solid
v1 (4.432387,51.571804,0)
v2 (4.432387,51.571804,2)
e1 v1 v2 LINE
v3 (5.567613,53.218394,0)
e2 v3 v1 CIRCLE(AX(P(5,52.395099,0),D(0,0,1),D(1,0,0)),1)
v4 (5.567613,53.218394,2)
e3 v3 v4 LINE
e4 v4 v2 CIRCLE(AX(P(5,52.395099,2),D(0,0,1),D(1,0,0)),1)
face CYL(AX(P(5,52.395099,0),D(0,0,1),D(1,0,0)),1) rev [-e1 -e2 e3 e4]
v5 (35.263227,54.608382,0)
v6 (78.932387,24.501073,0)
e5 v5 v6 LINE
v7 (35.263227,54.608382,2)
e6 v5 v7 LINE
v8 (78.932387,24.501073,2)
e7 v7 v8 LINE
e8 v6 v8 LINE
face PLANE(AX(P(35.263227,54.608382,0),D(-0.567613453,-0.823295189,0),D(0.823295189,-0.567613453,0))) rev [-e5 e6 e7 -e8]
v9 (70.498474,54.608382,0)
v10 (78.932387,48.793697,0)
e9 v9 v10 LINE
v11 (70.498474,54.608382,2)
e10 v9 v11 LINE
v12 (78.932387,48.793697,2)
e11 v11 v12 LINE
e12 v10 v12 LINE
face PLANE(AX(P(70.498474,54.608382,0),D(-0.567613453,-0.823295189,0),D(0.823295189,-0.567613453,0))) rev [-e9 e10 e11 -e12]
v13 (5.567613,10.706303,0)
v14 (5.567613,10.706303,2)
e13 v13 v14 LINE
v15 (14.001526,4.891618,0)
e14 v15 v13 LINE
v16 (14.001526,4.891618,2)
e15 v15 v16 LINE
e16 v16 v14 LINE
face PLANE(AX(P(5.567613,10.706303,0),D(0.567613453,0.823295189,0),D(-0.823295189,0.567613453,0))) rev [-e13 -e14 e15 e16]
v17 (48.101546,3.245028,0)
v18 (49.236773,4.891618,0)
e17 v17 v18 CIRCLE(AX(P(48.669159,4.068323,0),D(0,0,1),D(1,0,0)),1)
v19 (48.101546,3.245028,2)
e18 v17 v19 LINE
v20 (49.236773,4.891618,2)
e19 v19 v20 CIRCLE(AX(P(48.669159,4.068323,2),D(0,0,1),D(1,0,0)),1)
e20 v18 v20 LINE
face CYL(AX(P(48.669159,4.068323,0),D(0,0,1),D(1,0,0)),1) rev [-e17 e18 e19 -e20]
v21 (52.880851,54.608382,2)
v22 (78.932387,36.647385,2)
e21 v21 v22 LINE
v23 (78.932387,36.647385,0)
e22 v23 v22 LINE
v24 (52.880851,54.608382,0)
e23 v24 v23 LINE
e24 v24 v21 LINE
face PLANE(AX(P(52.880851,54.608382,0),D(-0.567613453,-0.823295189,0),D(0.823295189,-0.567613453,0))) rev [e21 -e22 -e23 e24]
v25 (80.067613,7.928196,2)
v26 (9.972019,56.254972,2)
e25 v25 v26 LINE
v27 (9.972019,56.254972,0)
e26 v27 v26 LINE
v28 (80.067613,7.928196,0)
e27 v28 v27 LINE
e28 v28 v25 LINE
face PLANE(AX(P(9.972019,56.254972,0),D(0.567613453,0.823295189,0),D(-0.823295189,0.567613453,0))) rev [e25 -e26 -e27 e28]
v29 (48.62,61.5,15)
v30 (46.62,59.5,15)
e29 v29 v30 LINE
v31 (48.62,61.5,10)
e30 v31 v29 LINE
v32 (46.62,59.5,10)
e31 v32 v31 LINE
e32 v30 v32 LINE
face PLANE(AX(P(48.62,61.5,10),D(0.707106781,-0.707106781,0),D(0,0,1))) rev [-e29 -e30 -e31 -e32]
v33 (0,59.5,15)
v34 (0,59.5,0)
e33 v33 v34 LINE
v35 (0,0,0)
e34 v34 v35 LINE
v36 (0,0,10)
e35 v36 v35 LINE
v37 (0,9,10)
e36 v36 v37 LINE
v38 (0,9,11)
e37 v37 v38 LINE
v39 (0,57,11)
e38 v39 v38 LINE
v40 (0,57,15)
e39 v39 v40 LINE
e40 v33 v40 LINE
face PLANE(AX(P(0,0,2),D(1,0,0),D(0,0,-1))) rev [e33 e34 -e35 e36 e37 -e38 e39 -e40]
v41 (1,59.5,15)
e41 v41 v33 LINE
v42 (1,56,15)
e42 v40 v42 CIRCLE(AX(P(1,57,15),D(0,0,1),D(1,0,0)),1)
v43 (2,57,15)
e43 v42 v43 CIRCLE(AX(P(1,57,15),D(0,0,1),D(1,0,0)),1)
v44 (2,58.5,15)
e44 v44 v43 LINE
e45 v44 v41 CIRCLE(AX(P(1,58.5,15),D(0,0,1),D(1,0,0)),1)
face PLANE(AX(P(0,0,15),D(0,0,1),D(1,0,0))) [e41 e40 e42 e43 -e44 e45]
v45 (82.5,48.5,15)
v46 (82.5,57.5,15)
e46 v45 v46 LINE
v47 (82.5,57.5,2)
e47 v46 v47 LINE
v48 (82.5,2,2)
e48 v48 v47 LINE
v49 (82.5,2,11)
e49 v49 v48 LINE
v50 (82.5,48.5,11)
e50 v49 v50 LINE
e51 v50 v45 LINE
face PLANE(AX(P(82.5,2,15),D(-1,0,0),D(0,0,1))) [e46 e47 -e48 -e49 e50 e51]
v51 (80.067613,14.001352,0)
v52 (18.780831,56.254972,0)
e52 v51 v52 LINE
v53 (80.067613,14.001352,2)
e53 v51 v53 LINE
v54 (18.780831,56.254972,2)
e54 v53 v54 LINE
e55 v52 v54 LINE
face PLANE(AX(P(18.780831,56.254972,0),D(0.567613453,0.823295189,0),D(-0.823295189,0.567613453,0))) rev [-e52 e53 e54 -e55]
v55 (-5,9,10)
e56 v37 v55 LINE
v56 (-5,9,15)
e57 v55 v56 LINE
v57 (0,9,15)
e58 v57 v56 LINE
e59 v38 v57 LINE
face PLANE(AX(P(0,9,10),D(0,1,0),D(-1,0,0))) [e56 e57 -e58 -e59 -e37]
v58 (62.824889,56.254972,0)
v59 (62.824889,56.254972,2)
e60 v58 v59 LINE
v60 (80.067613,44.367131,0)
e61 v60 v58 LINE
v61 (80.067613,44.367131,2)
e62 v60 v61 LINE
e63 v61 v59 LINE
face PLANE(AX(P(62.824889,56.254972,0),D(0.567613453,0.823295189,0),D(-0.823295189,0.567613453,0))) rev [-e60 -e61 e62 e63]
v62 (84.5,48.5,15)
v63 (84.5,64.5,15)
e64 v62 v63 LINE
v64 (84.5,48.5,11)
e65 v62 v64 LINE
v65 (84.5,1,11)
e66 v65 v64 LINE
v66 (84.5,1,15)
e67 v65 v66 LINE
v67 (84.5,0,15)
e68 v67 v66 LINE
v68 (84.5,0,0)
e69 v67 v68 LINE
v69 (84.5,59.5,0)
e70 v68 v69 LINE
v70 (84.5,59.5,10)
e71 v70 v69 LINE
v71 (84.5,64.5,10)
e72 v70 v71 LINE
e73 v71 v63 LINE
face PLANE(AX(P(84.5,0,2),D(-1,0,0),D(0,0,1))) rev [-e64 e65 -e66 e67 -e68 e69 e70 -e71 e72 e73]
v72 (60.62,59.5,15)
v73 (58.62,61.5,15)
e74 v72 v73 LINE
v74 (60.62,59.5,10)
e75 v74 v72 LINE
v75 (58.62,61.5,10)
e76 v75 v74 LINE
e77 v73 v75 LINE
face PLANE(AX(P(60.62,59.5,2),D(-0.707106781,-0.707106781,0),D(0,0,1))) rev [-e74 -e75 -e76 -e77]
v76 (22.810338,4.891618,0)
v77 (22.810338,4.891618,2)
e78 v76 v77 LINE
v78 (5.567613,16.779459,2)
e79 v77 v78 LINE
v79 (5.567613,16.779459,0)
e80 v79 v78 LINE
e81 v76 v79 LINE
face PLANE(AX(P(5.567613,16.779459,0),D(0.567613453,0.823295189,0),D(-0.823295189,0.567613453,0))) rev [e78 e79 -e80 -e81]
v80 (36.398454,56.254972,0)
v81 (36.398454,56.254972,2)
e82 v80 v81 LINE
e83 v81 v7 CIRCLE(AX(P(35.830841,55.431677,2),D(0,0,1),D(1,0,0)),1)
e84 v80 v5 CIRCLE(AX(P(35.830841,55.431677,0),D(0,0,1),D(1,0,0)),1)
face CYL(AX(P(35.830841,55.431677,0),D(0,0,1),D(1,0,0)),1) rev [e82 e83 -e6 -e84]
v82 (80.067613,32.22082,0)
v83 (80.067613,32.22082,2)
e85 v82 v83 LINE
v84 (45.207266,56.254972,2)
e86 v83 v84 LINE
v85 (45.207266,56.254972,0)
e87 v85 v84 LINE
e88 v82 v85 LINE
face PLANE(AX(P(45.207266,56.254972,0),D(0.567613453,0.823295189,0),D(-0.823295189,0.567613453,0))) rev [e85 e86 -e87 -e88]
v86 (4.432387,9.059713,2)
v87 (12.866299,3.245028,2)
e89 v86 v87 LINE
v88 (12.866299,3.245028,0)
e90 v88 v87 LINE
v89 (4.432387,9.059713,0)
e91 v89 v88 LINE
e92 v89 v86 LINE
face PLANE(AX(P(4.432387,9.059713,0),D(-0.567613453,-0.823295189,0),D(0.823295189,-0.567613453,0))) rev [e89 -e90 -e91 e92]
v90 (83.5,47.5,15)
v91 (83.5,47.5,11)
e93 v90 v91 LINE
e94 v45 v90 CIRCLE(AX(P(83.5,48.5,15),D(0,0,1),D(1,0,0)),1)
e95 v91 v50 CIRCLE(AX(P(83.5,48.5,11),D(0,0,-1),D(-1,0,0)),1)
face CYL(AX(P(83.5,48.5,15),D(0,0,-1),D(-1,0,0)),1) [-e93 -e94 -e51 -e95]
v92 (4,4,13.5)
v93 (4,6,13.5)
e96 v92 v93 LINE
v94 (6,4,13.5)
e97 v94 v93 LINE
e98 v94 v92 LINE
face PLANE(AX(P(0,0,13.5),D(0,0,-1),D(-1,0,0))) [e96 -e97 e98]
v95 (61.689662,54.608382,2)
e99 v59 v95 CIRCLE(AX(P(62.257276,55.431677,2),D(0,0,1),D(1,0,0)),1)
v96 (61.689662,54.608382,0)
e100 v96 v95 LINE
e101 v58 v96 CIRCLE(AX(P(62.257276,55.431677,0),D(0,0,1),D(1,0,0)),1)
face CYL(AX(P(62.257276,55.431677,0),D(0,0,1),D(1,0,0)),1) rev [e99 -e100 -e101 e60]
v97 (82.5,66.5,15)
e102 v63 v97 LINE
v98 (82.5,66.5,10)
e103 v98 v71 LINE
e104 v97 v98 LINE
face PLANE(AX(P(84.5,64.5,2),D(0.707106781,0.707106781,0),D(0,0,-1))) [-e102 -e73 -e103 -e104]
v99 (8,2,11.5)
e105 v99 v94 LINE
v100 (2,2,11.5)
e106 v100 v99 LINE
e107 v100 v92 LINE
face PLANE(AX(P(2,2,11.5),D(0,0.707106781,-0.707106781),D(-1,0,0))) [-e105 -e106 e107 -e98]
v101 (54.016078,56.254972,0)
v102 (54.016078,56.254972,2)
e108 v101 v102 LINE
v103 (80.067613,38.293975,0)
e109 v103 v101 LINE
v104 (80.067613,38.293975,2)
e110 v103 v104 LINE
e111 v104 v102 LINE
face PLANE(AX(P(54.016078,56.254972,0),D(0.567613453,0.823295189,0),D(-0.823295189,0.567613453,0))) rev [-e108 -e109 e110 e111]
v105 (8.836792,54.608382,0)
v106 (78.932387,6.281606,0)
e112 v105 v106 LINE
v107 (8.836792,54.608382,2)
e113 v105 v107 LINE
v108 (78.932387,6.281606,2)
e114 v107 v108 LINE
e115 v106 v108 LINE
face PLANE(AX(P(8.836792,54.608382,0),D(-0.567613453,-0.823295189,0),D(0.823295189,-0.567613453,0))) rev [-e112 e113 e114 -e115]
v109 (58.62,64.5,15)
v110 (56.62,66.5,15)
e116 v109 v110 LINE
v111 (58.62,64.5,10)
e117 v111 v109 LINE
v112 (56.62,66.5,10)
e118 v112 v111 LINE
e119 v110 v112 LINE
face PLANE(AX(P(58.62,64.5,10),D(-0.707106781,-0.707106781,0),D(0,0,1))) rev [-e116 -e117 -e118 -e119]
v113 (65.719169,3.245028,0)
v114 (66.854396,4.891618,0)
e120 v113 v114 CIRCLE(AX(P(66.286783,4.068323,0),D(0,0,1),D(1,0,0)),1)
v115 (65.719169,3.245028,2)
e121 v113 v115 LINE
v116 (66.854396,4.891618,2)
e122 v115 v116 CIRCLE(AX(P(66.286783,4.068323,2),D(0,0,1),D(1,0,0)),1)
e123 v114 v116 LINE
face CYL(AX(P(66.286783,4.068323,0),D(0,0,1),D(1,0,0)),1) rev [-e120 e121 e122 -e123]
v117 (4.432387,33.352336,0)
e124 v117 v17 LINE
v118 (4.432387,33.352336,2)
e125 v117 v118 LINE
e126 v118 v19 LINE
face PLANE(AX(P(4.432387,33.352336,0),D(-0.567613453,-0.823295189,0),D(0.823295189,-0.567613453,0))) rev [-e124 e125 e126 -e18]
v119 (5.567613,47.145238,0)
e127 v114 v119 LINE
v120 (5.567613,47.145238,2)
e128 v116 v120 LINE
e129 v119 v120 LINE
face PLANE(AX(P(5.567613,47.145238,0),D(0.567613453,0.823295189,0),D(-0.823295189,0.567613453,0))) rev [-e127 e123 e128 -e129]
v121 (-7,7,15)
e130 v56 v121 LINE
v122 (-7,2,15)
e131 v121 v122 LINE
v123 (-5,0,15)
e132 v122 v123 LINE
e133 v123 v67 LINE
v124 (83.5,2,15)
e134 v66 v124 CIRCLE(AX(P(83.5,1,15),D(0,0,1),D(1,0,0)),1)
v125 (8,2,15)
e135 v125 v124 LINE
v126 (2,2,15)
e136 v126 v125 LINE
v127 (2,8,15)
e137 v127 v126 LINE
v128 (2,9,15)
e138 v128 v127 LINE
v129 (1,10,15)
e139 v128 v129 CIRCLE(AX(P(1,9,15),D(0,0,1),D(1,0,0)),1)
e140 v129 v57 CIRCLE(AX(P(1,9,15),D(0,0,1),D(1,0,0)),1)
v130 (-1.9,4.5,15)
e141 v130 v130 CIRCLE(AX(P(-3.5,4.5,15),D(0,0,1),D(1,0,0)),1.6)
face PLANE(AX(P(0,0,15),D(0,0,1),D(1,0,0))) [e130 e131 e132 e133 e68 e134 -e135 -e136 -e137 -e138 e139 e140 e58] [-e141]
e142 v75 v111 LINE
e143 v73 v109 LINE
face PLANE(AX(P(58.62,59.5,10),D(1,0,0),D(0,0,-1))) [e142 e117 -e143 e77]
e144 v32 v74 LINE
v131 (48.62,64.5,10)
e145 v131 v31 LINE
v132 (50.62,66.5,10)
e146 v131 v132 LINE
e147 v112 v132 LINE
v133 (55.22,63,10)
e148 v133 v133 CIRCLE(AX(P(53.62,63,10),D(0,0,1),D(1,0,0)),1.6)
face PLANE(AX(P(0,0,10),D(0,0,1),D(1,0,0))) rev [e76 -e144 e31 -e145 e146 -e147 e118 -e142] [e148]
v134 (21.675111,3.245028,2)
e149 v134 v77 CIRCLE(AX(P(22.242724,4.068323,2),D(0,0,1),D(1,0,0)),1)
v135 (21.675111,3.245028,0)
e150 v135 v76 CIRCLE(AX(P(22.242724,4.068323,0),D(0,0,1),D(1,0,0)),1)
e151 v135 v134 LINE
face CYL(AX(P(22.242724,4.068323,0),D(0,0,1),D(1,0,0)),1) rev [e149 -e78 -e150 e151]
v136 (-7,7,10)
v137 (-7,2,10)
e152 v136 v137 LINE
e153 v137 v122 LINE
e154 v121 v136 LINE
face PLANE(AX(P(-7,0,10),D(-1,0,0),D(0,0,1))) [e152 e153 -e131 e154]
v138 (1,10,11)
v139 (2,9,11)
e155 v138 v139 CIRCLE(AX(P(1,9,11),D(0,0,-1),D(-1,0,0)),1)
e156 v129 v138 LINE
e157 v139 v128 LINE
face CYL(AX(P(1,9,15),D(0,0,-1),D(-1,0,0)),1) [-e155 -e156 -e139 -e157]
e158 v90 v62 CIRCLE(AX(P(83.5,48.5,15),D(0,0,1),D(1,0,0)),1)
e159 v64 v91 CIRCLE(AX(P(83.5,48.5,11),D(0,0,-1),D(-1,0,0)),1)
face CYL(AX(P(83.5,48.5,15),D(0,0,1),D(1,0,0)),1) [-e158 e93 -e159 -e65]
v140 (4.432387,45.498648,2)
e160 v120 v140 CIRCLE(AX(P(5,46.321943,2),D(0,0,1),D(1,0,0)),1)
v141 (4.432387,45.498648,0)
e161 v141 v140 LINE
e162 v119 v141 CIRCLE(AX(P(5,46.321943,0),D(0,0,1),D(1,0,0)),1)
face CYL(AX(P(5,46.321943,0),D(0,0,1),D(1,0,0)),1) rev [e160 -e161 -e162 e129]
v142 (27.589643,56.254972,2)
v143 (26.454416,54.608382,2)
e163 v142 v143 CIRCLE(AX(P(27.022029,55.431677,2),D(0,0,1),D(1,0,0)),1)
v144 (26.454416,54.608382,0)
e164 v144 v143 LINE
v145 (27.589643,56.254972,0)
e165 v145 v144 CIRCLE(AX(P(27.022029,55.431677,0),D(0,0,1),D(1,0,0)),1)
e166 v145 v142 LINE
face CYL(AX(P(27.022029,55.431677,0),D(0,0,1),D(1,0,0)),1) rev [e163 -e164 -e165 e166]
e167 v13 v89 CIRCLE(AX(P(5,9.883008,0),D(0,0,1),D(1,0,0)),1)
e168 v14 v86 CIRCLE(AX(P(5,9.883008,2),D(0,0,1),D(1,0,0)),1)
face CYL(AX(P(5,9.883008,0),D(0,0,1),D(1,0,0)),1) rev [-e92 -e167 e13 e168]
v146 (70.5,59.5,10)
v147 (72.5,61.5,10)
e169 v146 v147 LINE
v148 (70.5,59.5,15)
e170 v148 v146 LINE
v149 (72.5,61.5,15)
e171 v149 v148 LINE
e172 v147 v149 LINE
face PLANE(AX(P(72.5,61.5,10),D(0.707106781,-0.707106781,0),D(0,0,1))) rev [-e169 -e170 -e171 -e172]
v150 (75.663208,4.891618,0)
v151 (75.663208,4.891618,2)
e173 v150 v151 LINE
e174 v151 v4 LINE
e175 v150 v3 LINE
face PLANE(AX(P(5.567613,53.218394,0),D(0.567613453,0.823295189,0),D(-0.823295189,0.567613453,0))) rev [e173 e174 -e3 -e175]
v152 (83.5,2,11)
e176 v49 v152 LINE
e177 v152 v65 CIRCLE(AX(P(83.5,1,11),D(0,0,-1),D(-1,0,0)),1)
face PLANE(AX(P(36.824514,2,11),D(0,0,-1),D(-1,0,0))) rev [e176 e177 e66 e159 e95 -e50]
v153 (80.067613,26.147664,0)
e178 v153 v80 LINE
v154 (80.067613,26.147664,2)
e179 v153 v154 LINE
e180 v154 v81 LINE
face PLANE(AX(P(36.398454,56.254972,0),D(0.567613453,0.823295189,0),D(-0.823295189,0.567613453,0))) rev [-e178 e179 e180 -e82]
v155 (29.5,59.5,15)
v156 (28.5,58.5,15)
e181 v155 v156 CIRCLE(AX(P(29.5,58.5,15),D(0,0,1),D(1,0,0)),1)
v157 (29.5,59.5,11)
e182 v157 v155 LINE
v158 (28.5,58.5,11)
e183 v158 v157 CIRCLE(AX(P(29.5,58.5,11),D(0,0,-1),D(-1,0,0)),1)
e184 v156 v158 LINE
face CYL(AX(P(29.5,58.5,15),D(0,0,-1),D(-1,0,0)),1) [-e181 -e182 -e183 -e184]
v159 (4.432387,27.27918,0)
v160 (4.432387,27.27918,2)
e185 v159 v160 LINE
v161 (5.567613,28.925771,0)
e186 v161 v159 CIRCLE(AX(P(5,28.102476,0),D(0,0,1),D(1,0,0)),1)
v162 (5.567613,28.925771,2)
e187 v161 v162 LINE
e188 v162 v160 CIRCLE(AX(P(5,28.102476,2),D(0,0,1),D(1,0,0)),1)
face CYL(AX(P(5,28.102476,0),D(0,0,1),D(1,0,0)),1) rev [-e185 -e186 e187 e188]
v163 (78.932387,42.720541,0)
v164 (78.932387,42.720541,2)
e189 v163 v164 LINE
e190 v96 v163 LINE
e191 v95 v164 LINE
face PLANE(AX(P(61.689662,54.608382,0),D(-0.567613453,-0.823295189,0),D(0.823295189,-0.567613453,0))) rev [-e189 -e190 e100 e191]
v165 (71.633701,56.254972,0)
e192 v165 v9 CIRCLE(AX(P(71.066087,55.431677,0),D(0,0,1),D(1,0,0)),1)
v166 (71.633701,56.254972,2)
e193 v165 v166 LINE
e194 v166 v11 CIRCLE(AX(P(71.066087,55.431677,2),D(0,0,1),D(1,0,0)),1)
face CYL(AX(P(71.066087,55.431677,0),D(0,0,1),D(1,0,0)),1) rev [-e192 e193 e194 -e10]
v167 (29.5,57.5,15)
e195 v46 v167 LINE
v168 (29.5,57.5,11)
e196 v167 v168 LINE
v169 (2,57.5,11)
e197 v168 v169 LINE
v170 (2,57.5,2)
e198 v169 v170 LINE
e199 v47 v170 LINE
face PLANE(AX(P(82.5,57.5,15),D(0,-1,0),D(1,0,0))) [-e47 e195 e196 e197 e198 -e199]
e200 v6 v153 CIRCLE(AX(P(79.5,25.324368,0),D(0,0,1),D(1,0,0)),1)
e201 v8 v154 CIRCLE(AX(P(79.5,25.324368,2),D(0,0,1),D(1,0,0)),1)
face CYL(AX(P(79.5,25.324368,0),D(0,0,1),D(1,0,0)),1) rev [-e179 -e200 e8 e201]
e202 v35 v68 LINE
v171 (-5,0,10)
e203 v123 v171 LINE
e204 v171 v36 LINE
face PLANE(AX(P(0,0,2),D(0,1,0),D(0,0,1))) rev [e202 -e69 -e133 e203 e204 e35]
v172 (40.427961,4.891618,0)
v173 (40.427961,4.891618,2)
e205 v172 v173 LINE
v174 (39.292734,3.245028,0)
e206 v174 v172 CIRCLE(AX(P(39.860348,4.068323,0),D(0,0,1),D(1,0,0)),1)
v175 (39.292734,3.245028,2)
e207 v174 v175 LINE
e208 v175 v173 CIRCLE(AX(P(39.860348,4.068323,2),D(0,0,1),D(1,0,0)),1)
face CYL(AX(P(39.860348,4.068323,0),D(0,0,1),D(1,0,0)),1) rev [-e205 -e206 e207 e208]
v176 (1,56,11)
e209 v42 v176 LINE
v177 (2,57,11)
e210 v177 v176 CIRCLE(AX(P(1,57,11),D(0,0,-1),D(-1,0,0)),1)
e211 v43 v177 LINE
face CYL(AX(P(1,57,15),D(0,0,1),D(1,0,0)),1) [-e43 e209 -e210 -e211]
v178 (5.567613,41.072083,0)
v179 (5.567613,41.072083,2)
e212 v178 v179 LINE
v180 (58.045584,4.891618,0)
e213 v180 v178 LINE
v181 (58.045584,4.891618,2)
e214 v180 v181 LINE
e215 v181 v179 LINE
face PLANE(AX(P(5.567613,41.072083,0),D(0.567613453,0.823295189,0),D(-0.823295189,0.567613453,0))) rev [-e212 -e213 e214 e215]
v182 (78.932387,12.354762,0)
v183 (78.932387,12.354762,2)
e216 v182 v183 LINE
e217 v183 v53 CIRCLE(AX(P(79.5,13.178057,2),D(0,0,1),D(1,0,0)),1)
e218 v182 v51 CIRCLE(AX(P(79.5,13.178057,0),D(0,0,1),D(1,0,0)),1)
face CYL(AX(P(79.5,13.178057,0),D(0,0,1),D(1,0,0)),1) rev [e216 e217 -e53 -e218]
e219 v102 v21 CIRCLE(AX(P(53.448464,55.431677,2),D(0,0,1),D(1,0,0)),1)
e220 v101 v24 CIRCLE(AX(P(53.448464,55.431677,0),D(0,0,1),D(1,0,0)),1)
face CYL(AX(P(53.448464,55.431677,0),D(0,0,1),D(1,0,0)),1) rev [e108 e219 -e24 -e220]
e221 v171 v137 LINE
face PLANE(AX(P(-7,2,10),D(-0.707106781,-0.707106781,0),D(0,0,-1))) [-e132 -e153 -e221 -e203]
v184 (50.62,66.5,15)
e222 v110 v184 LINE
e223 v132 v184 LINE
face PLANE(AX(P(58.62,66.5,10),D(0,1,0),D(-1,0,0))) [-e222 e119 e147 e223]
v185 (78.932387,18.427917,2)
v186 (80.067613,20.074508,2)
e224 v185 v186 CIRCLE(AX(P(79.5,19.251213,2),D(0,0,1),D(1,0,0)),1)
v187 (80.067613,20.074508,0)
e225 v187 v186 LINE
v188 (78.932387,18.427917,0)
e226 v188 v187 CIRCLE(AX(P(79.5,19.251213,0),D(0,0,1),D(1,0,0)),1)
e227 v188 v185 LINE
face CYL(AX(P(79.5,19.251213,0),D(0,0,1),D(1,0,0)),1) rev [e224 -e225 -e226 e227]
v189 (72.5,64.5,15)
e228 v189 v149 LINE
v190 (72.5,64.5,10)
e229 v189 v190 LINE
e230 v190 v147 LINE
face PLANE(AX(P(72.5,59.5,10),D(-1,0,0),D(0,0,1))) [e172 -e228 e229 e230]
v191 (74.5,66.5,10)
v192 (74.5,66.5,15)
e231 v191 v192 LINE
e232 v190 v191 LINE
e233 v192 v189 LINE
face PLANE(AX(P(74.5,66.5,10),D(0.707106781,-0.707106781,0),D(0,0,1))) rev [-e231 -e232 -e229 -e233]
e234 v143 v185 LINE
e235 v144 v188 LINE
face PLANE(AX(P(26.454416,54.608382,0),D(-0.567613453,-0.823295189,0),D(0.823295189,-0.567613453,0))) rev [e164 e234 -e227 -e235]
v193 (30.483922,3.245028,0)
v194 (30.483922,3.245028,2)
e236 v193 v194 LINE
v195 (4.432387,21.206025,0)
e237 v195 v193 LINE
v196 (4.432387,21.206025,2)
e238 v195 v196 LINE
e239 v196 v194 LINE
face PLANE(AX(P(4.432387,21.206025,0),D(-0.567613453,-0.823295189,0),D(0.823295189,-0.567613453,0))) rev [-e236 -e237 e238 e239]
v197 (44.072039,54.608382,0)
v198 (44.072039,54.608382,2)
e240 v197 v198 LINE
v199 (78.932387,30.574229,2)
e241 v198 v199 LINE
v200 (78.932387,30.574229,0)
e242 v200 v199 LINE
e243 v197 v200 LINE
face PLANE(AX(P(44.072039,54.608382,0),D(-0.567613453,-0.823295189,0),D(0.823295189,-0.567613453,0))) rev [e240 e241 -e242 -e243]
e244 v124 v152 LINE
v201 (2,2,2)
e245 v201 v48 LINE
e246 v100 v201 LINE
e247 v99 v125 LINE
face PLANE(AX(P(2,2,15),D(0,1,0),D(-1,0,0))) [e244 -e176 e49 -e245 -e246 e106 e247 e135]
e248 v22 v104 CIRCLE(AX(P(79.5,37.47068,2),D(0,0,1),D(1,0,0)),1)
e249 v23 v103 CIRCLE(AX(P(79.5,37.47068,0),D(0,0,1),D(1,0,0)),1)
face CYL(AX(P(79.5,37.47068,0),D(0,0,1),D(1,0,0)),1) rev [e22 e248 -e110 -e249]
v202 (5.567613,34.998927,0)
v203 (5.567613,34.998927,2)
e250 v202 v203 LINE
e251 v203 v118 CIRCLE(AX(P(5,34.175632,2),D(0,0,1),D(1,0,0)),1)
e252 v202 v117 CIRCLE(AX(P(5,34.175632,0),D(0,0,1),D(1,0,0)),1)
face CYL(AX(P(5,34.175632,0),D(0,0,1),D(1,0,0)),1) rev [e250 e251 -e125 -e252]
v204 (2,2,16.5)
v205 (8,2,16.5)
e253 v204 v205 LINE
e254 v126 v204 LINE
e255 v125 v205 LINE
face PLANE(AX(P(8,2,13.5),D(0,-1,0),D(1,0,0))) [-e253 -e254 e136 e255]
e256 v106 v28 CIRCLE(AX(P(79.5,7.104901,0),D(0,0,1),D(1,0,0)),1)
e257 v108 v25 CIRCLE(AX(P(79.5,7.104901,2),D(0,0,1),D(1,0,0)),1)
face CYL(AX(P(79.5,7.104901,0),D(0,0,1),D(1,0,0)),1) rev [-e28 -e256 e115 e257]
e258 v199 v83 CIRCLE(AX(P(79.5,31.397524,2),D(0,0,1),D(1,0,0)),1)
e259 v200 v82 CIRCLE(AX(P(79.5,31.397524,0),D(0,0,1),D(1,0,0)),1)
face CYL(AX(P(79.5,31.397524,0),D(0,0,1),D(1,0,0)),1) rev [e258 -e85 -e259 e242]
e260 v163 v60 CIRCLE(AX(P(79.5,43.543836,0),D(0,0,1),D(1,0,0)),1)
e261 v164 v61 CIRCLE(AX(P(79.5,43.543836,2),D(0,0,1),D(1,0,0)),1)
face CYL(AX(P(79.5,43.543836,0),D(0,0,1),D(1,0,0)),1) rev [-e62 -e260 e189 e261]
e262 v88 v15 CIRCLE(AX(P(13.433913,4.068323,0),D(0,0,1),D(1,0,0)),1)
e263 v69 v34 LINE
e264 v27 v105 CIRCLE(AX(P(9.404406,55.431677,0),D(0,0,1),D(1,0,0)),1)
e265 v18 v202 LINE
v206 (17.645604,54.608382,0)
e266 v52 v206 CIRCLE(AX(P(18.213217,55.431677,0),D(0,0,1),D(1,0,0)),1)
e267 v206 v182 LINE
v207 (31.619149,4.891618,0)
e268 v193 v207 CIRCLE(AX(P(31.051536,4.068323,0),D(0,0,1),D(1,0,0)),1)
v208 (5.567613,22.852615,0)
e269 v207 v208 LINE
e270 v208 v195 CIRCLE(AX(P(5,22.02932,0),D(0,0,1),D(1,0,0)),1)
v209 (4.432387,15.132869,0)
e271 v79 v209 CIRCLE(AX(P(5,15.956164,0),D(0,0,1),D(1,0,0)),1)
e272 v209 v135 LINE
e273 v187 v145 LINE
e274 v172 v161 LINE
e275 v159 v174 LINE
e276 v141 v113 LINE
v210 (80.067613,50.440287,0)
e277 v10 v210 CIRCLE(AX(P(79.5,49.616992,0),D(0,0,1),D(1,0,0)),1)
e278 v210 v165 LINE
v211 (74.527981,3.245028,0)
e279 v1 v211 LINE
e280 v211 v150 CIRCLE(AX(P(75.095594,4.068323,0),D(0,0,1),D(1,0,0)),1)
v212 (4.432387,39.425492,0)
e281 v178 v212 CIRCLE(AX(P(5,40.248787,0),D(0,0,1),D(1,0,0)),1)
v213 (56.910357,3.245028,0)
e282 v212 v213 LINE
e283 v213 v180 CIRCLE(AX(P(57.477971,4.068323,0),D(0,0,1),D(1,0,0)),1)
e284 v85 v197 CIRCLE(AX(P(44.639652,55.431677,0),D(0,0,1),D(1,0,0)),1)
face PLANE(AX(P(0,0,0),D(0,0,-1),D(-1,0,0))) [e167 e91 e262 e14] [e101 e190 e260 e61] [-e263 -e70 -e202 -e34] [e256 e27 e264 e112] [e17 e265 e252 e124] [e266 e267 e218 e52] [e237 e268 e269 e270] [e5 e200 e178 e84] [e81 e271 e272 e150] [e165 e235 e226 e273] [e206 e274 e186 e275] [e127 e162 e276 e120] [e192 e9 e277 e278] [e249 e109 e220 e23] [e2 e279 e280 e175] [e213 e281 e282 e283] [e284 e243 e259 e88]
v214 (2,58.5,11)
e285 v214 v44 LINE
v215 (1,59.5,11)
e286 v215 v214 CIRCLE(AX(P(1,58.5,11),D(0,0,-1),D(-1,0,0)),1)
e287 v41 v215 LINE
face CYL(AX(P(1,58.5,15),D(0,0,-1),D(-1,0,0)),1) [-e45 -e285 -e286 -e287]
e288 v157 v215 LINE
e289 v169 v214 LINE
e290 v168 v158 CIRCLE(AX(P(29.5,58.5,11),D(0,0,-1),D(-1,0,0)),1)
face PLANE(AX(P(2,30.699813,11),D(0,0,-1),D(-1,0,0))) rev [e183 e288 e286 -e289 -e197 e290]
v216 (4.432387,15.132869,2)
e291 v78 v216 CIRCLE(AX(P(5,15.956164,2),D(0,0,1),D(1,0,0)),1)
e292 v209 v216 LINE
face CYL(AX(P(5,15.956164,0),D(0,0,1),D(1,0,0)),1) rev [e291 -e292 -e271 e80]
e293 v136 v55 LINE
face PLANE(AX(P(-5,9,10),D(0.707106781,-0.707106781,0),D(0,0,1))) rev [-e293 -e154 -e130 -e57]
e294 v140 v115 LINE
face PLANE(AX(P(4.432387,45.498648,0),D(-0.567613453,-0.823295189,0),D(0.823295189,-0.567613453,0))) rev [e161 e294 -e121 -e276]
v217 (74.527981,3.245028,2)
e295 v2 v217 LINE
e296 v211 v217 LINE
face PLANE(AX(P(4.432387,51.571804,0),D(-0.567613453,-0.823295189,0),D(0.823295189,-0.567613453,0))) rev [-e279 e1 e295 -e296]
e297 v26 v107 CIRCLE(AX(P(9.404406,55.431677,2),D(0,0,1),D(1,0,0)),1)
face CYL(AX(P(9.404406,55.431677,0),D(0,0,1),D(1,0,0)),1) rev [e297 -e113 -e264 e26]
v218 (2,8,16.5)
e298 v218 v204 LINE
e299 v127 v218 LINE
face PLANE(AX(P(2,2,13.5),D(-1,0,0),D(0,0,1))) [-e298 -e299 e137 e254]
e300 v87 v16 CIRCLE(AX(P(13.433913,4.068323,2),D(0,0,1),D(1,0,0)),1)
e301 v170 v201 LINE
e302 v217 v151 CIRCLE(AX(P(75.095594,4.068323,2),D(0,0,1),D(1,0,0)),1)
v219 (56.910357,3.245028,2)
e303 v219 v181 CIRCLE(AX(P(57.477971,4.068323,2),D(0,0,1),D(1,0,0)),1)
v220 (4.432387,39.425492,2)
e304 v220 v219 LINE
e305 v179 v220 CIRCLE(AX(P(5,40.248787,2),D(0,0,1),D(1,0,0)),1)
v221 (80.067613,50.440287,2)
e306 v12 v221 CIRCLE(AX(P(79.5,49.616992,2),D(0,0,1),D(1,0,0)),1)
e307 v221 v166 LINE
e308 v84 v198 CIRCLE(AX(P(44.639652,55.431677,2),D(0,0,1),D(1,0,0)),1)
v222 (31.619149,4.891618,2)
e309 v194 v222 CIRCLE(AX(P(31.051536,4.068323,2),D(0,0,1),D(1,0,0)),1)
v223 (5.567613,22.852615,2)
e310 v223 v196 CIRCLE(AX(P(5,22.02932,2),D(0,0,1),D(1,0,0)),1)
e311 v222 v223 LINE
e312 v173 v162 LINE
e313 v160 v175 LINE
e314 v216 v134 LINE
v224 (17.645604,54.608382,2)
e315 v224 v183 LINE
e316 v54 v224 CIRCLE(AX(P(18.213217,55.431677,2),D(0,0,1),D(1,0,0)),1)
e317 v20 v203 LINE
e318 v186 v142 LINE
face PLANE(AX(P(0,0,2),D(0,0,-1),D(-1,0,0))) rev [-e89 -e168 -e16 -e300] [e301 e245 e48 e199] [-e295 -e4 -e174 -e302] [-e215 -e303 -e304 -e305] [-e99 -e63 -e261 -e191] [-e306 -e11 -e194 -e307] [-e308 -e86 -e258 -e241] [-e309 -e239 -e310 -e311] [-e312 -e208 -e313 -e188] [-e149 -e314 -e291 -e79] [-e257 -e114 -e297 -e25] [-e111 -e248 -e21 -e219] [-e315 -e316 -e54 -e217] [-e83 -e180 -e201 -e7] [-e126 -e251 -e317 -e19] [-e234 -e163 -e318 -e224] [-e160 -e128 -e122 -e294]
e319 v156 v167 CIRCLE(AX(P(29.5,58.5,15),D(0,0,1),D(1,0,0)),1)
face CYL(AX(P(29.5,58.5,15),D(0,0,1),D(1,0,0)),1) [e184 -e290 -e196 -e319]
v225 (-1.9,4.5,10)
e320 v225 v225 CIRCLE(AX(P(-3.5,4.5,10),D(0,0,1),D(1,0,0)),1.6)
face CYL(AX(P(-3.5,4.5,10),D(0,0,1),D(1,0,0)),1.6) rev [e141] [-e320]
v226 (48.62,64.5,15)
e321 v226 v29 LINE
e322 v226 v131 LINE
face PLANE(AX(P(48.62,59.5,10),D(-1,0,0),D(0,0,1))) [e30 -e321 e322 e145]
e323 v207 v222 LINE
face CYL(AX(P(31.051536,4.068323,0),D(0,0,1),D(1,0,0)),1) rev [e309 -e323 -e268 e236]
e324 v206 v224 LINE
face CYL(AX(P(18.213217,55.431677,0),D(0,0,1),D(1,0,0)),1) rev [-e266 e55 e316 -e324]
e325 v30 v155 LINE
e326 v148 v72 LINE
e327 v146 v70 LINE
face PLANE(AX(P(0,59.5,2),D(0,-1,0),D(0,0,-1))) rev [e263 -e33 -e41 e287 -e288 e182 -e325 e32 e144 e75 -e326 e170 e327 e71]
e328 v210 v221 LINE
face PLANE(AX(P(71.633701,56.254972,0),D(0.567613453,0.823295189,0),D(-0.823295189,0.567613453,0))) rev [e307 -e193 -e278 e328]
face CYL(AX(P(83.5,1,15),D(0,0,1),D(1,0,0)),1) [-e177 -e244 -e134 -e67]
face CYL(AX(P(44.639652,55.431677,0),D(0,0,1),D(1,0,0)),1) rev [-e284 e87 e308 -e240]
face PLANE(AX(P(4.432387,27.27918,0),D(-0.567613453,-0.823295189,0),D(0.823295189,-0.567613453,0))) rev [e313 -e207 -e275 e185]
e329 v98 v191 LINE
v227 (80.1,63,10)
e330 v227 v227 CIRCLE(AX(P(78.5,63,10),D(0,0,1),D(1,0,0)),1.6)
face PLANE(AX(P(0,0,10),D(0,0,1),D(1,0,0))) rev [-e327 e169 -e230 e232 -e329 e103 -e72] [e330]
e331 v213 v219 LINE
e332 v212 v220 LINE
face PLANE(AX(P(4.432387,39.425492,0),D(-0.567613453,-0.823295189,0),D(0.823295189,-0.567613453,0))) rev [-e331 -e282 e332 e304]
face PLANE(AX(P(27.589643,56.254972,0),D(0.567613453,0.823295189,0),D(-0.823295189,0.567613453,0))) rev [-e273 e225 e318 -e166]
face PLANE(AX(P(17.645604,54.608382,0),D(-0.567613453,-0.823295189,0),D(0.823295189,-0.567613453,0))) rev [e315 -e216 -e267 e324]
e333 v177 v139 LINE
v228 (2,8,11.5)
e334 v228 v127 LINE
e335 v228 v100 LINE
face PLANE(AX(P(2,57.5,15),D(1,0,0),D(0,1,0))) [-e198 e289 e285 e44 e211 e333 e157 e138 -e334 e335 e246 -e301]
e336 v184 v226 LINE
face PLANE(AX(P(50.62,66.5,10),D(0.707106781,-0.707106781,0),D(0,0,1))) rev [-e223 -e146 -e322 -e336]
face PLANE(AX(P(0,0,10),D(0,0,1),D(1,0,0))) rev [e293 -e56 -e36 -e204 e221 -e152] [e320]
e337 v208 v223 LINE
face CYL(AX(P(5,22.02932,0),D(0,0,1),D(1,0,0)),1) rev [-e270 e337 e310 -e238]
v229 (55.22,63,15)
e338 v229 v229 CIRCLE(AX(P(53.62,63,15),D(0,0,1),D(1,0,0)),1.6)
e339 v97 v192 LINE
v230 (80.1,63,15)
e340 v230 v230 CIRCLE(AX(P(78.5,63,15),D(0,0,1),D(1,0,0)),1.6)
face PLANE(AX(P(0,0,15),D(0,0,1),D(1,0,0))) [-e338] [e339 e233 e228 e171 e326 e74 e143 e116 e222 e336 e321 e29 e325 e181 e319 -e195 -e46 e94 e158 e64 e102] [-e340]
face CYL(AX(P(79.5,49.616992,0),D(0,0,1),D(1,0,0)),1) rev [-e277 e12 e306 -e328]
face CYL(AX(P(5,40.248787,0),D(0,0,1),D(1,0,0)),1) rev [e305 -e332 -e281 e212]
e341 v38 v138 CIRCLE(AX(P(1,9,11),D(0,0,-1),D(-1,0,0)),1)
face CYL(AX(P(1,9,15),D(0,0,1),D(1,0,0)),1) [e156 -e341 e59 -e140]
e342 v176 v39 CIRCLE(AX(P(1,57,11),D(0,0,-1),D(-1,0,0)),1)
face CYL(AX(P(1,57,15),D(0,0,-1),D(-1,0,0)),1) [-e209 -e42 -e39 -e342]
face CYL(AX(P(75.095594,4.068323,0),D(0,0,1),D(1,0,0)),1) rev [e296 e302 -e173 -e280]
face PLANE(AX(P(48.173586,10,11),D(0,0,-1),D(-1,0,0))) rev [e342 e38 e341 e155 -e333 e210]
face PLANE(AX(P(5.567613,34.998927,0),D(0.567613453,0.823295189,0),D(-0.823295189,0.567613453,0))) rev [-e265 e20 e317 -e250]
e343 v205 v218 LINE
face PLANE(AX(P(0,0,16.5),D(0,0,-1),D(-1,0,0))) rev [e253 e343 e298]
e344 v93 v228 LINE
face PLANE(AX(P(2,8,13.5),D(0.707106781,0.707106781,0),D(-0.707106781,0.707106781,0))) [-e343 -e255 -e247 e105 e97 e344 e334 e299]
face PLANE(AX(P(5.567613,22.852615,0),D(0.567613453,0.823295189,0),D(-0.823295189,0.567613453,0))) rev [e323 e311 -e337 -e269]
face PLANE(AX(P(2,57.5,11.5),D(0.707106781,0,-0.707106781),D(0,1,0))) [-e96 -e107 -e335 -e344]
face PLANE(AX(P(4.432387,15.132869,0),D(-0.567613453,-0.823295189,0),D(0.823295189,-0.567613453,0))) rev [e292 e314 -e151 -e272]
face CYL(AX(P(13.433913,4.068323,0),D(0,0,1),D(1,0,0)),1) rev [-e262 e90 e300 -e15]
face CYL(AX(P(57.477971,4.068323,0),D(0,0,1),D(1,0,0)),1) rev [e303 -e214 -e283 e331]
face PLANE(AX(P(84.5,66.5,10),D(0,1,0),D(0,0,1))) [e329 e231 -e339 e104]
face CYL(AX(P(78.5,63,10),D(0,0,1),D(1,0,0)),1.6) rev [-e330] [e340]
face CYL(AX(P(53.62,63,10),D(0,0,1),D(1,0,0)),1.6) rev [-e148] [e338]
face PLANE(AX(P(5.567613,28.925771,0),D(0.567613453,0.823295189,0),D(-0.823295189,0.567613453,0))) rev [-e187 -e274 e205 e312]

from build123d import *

# Parameters (mm, degrees)
SKETCH_1_W          = 84.5
SKETCH_1_H          = 59.5
EXTRUDE_1_DEPTH     = 2
SKETCH_2_W          = 84.5
SKETCH_2_H          = 59.5
SKETCH_2_W_2        = 80.5
SKETCH_2_H_2        = 55.5
EXTRUDE_2_DEPTH     = 13
SKETCH_3_W          = 26.5
SKETCH_3_H          = 4
CUT_EXTRUDE_1_DEPTH = 2
SKETCH_4_W          = 4
SKETCH_4_H          = 46
CUT_EXTRUDE_2_DEPTH = 2
SKETCH_5_W          = 4
SKETCH_5_H          = 45.5
CUT_EXTRUDE_3_DEPTH = 2
CUT_EXTRUDE_4_DEPTH = 105.160933176
SKETCH_9_W          = 7
SKETCH_9_H          = 9
SKETCH_9_R          = 1.6
EXTRUDE_5_DEPTH     = 5
FILLET_1_R          = 1
EXTRUDE_8_DEPTH     = 3
CHAMFER_4_SIZE      = 2
SKETCH_16_W         = 12
SKETCH_16_H         = 7
SKETCH_16_R         = 1.6
SKETCH_16_W_2       = 10
EXTRUDE_9_DEPTH     = 5
CHAMFER_5_SIZE      = 2


with BuildPart() as part:
    # 草图1 → 凸台-拉伸1 (new body)
    with BuildSketch(Plane.XY):
        with Locations((42.25, 29.75)):
            Rectangle(SKETCH_1_W, SKETCH_1_H)
    extrude(amount=EXTRUDE_1_DEPTH)

    # 草图2 → 凸台-拉伸2 (add)
    with BuildSketch(Plane.XY.offset(2)):
        with Locations((42.25, 29.75)):
            Rectangle(SKETCH_2_W, SKETCH_2_H)
        with Locations((42.25, 29.75)):
            Rectangle(SKETCH_2_W_2, SKETCH_2_H_2, mode=Mode.SUBTRACT)
    extrude(amount=EXTRUDE_2_DEPTH)

    # 草图3 → 切除-拉伸1 (cut)
    with BuildSketch(Plane(origin=(0, 59.5, 0), x_dir=(1, 0, 0), z_dir=(0, 1, 0))):
        with Locations((15.25, -13)):
            Rectangle(SKETCH_3_W, SKETCH_3_H)
    extrude(amount=-CUT_EXTRUDE_1_DEPTH, mode=Mode.SUBTRACT)

    # 草图4 → 切除-拉伸2 (cut)
    with BuildSketch(Plane.ZY):
        with Locations((13, 33)):
            Rectangle(SKETCH_4_W, SKETCH_4_H)
    extrude(amount=-CUT_EXTRUDE_2_DEPTH, mode=Mode.SUBTRACT)

    # 草图5 → 切除-拉伸3 (cut)
    with BuildSketch(Plane(origin=(84.5, 0, 0), x_dir=(0, 0, -1), z_dir=(1, 0, 0))):
        with Locations((-13, 24.75)):
            Rectangle(SKETCH_5_W, SKETCH_5_H)
    extrude(amount=-CUT_EXTRUDE_3_DEPTH, mode=Mode.SUBTRACT)

    # 草图6 → 切除-拉伸4 (cut, through all)
    with BuildSketch(Plane.XY.offset(2)):
        with BuildLine():
            Line((5.567613453, 16.779459118), (22.810337711, 4.89161817))
            ThreePointArc((22.810337711, 4.89161817), (23.066019447, 3.500709528), (21.675110805, 3.245027793))
            Line((21.675110805, 3.245027793), (4.432386547, 15.132868741))
            ThreePointArc((4.432386547, 15.132868741), (4.176704811, 16.523777383), (5.567613453, 16.779459118))
        make_face()
        with BuildLine():
            Line((5.567613453, 22.852614978), (31.619149364, 4.89161817))
            ThreePointArc((31.619149364, 4.89161817), (31.8748311, 3.500709528), (30.483922458, 3.245027793))
            Line((30.483922458, 3.245027793), (4.432386547, 21.206024601))
            ThreePointArc((4.432386547, 21.206024601), (4.176704811, 22.596933243), (5.567613453, 22.852614978))
        make_face()
        with BuildLine():
            Line((5.567613453, 28.925770838), (40.427961017, 4.89161817))
            ThreePointArc((40.427961017, 4.89161817), (40.683642752, 3.500709528), (39.29273411, 3.245027793))
            Line((39.29273411, 3.245027793), (4.432386547, 27.279180461))
            ThreePointArc((4.432386547, 27.279180461), (4.176704811, 28.670089102), (5.567613453, 28.925770838))
        make_face()
        with BuildLine():
            Line((5.567613453, 34.998926698), (49.236772669, 4.89161817))
            ThreePointArc((49.236772669, 4.89161817), (49.492454405, 3.500709528), (48.101545763, 3.245027793))
            Line((48.101545763, 3.245027793), (4.432386547, 33.35233632))
            ThreePointArc((4.432386547, 33.35233632), (4.176704811, 34.743244962), (5.567613453, 34.998926698))
        make_face()
        with BuildLine():
            Line((5.567613453, 41.072082558), (58.045584322, 4.89161817))
            ThreePointArc((58.045584322, 4.89161817), (58.301266057, 3.500709528), (56.910357415, 3.245027793))
            Line((56.910357415, 3.245027793), (4.432386547, 39.42549218))
            ThreePointArc((4.432386547, 39.42549218), (4.176704811, 40.816400822), (5.567613453, 41.072082558))
        make_face()
        with BuildLine():
            Line((5.567613453, 47.145238418), (66.854395974, 4.89161817))
            ThreePointArc((66.854395974, 4.89161817), (67.11007771, 3.500709528), (65.719169068, 3.245027793))
            Line((65.719169068, 3.245027793), (4.432386547, 45.49864804))
            ThreePointArc((4.432386547, 45.49864804), (4.176704811, 46.889556682), (5.567613453, 47.145238418))
        make_face()
        with BuildLine():
            Line((9.972019279, 56.254972207), (80.067613453, 7.9281961))
            ThreePointArc((80.067613453, 7.9281961), (80.323295189, 6.537287458), (78.932386547, 6.281605723))
            Line((78.932386547, 6.281605723), (8.836792373, 54.60838183))
            ThreePointArc((8.836792373, 54.60838183), (8.581110638, 55.999290472), (9.972019279, 56.254972207))
        make_face()
        with BuildLine():
            Line((5.567613453, 53.218394277), (75.663207627, 4.89161817))
            ThreePointArc((75.663207627, 4.89161817), (75.918889362, 3.500709528), (74.527980721, 3.245027793))
            Line((74.527980721, 3.245027793), (4.432386547, 51.5718039))
            ThreePointArc((4.432386547, 51.5718039), (4.176704811, 52.962712542), (5.567613453, 53.218394277))
        make_face()
        with BuildLine():
            Line((5.567613453, 10.706303259), (14.001526059, 4.89161817))
            ThreePointArc((14.001526059, 4.89161817), (14.257207795, 3.500709528), (12.866299153, 3.245027793))
            Line((12.866299153, 3.245027793), (4.432386547, 9.059712881))
            ThreePointArc((4.432386547, 9.059712881), (4.176704811, 10.450621523), (5.567613453, 10.706303259))
        make_face()
        with BuildLine():
            Line((18.780830932, 56.254972207), (80.067613453, 14.00135196))
            ThreePointArc((80.067613453, 14.00135196), (80.323295189, 12.610443318), (78.932386547, 12.354761582))
            Line((78.932386547, 12.354761582), (17.645604026, 54.60838183))
            ThreePointArc((17.645604026, 54.60838183), (17.38992229, 55.999290472), (18.780830932, 56.254972207))
        make_face()
        with BuildLine():
            Line((27.589642585, 56.254972207), (80.067613453, 20.07450782))
            ThreePointArc((80.067613453, 20.07450782), (80.323295189, 18.683599178), (78.932386547, 18.427917442))
            Line((78.932386547, 18.427917442), (26.454415678, 54.60838183))
            ThreePointArc((26.454415678, 54.60838183), (26.198733943, 55.999290472), (27.589642585, 56.254972207))
        make_face()
        with BuildLine():
            Line((36.398454237, 56.254972207), (80.067613453, 26.14766368))
            ThreePointArc((80.067613453, 26.14766368), (80.323295189, 24.756755038), (78.932386547, 24.501073302))
            Line((78.932386547, 24.501073302), (35.263227331, 54.60838183))
            ThreePointArc((35.263227331, 54.60838183), (35.007545595, 55.999290472), (36.398454237, 56.254972207))
        make_face()
        with BuildLine():
            Line((45.20726589, 56.254972207), (80.067613453, 32.220819539))
            ThreePointArc((80.067613453, 32.220819539), (80.323295189, 30.829910898), (78.932386547, 30.574229162))
            Line((78.932386547, 30.574229162), (44.072038983, 54.60838183))
            ThreePointArc((44.072038983, 54.60838183), (43.816357248, 55.999290472), (45.20726589, 56.254972207))
        make_face()
        with BuildLine():
            Line((54.016077542, 56.254972207), (80.067613453, 38.293975399))
            ThreePointArc((80.067613453, 38.293975399), (80.323295189, 36.903066757), (78.932386547, 36.647385022))
            Line((78.932386547, 36.647385022), (52.880850636, 54.60838183))
            ThreePointArc((52.880850636, 54.60838183), (52.6251689, 55.999290472), (54.016077542, 56.254972207))
        make_face()
        with BuildLine():
            Line((62.824889195, 56.254972207), (80.067613453, 44.367131259))
            ThreePointArc((80.067613453, 44.367131259), (80.323295189, 42.976222617), (78.932386547, 42.720540882))
            Line((78.932386547, 42.720540882), (61.689662289, 54.60838183))
            ThreePointArc((61.689662289, 54.60838183), (61.433980553, 55.999290472), (62.824889195, 56.254972207))
        make_face()
        with BuildLine():
            Line((71.633700847, 56.254972207), (80.067613453, 50.440287119))
            ThreePointArc((80.067613453, 50.440287119), (80.323295189, 49.049378477), (78.932386547, 48.793696741))
            Line((78.932386547, 48.793696741), (70.498473941, 54.60838183))
            ThreePointArc((70.498473941, 54.60838183), (70.242792205, 55.999290472), (71.633700847, 56.254972207))
        make_face()
    extrude(amount=-CUT_EXTRUDE_4_DEPTH, mode=Mode.SUBTRACT)

    # 草图9 → 凸台-拉伸5 (add)
    with BuildSketch(Plane.XY.offset(15)):
        with Locations((-3.5, 4.5)):
            Rectangle(SKETCH_9_W, SKETCH_9_H)
        with Locations((-3.5, 4.5)):
            Circle(SKETCH_9_R, mode=Mode.SUBTRACT)
    extrude(amount=-EXTRUDE_5_DEPTH)

    # 圆角1
    fillet_1_edges = [part.edges().sort_by_distance(p)[0] for p in [
        (2, 10, 13),
        (84.5, 47.5, 13),
        (82.5, 47.5, 13),
        (84.5, 2, 13),
        (28.5, 57.5, 13),
        (28.5, 59.5, 13),
        (2, 59.5, 13),
        (2, 56, 13),
        (0, 56, 13),
        (0, 10, 13),
    ]]
    fillet(fillet_1_edges, radius=FILLET_1_R - 0.0001)  # a hair under: the kernel refuses the full size

    # 草图15 → 凸台-拉伸8 (add)
    with BuildSketch(Plane.XY.offset(16.5)):
        Polygon((2, 2), (2, 8), (8, 2), align=None)
    extrude(amount=-EXTRUDE_8_DEPTH)

    # 倒角4
    chamfer_4_edges = [part.edges().sort_by_distance(p)[0] for p in [
        (5, 2, 13.5),
        (2, 5, 13.5),
    ]]
    chamfer(chamfer_4_edges, length=CHAMFER_4_SIZE)

    # 草图16 → 凸台-拉伸9 (add)
    # profile 1 of 2: a face of its own
    with BuildSketch(Plane.XY.offset(15)):
        with Locations((78.5, 63)):
            Rectangle(SKETCH_16_W, SKETCH_16_H)
        with Locations((78.5, 63)):
            Circle(SKETCH_16_R, mode=Mode.SUBTRACT)
    # profile 2 of 2: a face of its own
    with BuildSketch(Plane.XY.offset(15)):
        with Locations((53.62, 63)):
            Rectangle(SKETCH_16_W_2, SKETCH_16_H)
        with Locations((53.62, 63)):
            Circle(SKETCH_16_R, mode=Mode.SUBTRACT)
    extrude(amount=-EXTRUDE_9_DEPTH)

    # 倒角5
    chamfer_5_edges = [part.edges().sort_by_distance(p)[0] for p in [
        (-7, 0, 12.5),
        (-7, 9, 12.5),
        (84.5, 66.5, 12.5),
        (72.5, 59.5, 12.5),
        (72.5, 66.5, 12.5),
        (58.62, 66.5, 12.5),
        (58.62, 59.5, 12.5),
        (48.62, 59.5, 12.5),
        (48.62, 66.5, 12.5),
    ]]
    chamfer(chamfer_5_edges, length=CHAMFER_5_SIZE)


solid = part.part
